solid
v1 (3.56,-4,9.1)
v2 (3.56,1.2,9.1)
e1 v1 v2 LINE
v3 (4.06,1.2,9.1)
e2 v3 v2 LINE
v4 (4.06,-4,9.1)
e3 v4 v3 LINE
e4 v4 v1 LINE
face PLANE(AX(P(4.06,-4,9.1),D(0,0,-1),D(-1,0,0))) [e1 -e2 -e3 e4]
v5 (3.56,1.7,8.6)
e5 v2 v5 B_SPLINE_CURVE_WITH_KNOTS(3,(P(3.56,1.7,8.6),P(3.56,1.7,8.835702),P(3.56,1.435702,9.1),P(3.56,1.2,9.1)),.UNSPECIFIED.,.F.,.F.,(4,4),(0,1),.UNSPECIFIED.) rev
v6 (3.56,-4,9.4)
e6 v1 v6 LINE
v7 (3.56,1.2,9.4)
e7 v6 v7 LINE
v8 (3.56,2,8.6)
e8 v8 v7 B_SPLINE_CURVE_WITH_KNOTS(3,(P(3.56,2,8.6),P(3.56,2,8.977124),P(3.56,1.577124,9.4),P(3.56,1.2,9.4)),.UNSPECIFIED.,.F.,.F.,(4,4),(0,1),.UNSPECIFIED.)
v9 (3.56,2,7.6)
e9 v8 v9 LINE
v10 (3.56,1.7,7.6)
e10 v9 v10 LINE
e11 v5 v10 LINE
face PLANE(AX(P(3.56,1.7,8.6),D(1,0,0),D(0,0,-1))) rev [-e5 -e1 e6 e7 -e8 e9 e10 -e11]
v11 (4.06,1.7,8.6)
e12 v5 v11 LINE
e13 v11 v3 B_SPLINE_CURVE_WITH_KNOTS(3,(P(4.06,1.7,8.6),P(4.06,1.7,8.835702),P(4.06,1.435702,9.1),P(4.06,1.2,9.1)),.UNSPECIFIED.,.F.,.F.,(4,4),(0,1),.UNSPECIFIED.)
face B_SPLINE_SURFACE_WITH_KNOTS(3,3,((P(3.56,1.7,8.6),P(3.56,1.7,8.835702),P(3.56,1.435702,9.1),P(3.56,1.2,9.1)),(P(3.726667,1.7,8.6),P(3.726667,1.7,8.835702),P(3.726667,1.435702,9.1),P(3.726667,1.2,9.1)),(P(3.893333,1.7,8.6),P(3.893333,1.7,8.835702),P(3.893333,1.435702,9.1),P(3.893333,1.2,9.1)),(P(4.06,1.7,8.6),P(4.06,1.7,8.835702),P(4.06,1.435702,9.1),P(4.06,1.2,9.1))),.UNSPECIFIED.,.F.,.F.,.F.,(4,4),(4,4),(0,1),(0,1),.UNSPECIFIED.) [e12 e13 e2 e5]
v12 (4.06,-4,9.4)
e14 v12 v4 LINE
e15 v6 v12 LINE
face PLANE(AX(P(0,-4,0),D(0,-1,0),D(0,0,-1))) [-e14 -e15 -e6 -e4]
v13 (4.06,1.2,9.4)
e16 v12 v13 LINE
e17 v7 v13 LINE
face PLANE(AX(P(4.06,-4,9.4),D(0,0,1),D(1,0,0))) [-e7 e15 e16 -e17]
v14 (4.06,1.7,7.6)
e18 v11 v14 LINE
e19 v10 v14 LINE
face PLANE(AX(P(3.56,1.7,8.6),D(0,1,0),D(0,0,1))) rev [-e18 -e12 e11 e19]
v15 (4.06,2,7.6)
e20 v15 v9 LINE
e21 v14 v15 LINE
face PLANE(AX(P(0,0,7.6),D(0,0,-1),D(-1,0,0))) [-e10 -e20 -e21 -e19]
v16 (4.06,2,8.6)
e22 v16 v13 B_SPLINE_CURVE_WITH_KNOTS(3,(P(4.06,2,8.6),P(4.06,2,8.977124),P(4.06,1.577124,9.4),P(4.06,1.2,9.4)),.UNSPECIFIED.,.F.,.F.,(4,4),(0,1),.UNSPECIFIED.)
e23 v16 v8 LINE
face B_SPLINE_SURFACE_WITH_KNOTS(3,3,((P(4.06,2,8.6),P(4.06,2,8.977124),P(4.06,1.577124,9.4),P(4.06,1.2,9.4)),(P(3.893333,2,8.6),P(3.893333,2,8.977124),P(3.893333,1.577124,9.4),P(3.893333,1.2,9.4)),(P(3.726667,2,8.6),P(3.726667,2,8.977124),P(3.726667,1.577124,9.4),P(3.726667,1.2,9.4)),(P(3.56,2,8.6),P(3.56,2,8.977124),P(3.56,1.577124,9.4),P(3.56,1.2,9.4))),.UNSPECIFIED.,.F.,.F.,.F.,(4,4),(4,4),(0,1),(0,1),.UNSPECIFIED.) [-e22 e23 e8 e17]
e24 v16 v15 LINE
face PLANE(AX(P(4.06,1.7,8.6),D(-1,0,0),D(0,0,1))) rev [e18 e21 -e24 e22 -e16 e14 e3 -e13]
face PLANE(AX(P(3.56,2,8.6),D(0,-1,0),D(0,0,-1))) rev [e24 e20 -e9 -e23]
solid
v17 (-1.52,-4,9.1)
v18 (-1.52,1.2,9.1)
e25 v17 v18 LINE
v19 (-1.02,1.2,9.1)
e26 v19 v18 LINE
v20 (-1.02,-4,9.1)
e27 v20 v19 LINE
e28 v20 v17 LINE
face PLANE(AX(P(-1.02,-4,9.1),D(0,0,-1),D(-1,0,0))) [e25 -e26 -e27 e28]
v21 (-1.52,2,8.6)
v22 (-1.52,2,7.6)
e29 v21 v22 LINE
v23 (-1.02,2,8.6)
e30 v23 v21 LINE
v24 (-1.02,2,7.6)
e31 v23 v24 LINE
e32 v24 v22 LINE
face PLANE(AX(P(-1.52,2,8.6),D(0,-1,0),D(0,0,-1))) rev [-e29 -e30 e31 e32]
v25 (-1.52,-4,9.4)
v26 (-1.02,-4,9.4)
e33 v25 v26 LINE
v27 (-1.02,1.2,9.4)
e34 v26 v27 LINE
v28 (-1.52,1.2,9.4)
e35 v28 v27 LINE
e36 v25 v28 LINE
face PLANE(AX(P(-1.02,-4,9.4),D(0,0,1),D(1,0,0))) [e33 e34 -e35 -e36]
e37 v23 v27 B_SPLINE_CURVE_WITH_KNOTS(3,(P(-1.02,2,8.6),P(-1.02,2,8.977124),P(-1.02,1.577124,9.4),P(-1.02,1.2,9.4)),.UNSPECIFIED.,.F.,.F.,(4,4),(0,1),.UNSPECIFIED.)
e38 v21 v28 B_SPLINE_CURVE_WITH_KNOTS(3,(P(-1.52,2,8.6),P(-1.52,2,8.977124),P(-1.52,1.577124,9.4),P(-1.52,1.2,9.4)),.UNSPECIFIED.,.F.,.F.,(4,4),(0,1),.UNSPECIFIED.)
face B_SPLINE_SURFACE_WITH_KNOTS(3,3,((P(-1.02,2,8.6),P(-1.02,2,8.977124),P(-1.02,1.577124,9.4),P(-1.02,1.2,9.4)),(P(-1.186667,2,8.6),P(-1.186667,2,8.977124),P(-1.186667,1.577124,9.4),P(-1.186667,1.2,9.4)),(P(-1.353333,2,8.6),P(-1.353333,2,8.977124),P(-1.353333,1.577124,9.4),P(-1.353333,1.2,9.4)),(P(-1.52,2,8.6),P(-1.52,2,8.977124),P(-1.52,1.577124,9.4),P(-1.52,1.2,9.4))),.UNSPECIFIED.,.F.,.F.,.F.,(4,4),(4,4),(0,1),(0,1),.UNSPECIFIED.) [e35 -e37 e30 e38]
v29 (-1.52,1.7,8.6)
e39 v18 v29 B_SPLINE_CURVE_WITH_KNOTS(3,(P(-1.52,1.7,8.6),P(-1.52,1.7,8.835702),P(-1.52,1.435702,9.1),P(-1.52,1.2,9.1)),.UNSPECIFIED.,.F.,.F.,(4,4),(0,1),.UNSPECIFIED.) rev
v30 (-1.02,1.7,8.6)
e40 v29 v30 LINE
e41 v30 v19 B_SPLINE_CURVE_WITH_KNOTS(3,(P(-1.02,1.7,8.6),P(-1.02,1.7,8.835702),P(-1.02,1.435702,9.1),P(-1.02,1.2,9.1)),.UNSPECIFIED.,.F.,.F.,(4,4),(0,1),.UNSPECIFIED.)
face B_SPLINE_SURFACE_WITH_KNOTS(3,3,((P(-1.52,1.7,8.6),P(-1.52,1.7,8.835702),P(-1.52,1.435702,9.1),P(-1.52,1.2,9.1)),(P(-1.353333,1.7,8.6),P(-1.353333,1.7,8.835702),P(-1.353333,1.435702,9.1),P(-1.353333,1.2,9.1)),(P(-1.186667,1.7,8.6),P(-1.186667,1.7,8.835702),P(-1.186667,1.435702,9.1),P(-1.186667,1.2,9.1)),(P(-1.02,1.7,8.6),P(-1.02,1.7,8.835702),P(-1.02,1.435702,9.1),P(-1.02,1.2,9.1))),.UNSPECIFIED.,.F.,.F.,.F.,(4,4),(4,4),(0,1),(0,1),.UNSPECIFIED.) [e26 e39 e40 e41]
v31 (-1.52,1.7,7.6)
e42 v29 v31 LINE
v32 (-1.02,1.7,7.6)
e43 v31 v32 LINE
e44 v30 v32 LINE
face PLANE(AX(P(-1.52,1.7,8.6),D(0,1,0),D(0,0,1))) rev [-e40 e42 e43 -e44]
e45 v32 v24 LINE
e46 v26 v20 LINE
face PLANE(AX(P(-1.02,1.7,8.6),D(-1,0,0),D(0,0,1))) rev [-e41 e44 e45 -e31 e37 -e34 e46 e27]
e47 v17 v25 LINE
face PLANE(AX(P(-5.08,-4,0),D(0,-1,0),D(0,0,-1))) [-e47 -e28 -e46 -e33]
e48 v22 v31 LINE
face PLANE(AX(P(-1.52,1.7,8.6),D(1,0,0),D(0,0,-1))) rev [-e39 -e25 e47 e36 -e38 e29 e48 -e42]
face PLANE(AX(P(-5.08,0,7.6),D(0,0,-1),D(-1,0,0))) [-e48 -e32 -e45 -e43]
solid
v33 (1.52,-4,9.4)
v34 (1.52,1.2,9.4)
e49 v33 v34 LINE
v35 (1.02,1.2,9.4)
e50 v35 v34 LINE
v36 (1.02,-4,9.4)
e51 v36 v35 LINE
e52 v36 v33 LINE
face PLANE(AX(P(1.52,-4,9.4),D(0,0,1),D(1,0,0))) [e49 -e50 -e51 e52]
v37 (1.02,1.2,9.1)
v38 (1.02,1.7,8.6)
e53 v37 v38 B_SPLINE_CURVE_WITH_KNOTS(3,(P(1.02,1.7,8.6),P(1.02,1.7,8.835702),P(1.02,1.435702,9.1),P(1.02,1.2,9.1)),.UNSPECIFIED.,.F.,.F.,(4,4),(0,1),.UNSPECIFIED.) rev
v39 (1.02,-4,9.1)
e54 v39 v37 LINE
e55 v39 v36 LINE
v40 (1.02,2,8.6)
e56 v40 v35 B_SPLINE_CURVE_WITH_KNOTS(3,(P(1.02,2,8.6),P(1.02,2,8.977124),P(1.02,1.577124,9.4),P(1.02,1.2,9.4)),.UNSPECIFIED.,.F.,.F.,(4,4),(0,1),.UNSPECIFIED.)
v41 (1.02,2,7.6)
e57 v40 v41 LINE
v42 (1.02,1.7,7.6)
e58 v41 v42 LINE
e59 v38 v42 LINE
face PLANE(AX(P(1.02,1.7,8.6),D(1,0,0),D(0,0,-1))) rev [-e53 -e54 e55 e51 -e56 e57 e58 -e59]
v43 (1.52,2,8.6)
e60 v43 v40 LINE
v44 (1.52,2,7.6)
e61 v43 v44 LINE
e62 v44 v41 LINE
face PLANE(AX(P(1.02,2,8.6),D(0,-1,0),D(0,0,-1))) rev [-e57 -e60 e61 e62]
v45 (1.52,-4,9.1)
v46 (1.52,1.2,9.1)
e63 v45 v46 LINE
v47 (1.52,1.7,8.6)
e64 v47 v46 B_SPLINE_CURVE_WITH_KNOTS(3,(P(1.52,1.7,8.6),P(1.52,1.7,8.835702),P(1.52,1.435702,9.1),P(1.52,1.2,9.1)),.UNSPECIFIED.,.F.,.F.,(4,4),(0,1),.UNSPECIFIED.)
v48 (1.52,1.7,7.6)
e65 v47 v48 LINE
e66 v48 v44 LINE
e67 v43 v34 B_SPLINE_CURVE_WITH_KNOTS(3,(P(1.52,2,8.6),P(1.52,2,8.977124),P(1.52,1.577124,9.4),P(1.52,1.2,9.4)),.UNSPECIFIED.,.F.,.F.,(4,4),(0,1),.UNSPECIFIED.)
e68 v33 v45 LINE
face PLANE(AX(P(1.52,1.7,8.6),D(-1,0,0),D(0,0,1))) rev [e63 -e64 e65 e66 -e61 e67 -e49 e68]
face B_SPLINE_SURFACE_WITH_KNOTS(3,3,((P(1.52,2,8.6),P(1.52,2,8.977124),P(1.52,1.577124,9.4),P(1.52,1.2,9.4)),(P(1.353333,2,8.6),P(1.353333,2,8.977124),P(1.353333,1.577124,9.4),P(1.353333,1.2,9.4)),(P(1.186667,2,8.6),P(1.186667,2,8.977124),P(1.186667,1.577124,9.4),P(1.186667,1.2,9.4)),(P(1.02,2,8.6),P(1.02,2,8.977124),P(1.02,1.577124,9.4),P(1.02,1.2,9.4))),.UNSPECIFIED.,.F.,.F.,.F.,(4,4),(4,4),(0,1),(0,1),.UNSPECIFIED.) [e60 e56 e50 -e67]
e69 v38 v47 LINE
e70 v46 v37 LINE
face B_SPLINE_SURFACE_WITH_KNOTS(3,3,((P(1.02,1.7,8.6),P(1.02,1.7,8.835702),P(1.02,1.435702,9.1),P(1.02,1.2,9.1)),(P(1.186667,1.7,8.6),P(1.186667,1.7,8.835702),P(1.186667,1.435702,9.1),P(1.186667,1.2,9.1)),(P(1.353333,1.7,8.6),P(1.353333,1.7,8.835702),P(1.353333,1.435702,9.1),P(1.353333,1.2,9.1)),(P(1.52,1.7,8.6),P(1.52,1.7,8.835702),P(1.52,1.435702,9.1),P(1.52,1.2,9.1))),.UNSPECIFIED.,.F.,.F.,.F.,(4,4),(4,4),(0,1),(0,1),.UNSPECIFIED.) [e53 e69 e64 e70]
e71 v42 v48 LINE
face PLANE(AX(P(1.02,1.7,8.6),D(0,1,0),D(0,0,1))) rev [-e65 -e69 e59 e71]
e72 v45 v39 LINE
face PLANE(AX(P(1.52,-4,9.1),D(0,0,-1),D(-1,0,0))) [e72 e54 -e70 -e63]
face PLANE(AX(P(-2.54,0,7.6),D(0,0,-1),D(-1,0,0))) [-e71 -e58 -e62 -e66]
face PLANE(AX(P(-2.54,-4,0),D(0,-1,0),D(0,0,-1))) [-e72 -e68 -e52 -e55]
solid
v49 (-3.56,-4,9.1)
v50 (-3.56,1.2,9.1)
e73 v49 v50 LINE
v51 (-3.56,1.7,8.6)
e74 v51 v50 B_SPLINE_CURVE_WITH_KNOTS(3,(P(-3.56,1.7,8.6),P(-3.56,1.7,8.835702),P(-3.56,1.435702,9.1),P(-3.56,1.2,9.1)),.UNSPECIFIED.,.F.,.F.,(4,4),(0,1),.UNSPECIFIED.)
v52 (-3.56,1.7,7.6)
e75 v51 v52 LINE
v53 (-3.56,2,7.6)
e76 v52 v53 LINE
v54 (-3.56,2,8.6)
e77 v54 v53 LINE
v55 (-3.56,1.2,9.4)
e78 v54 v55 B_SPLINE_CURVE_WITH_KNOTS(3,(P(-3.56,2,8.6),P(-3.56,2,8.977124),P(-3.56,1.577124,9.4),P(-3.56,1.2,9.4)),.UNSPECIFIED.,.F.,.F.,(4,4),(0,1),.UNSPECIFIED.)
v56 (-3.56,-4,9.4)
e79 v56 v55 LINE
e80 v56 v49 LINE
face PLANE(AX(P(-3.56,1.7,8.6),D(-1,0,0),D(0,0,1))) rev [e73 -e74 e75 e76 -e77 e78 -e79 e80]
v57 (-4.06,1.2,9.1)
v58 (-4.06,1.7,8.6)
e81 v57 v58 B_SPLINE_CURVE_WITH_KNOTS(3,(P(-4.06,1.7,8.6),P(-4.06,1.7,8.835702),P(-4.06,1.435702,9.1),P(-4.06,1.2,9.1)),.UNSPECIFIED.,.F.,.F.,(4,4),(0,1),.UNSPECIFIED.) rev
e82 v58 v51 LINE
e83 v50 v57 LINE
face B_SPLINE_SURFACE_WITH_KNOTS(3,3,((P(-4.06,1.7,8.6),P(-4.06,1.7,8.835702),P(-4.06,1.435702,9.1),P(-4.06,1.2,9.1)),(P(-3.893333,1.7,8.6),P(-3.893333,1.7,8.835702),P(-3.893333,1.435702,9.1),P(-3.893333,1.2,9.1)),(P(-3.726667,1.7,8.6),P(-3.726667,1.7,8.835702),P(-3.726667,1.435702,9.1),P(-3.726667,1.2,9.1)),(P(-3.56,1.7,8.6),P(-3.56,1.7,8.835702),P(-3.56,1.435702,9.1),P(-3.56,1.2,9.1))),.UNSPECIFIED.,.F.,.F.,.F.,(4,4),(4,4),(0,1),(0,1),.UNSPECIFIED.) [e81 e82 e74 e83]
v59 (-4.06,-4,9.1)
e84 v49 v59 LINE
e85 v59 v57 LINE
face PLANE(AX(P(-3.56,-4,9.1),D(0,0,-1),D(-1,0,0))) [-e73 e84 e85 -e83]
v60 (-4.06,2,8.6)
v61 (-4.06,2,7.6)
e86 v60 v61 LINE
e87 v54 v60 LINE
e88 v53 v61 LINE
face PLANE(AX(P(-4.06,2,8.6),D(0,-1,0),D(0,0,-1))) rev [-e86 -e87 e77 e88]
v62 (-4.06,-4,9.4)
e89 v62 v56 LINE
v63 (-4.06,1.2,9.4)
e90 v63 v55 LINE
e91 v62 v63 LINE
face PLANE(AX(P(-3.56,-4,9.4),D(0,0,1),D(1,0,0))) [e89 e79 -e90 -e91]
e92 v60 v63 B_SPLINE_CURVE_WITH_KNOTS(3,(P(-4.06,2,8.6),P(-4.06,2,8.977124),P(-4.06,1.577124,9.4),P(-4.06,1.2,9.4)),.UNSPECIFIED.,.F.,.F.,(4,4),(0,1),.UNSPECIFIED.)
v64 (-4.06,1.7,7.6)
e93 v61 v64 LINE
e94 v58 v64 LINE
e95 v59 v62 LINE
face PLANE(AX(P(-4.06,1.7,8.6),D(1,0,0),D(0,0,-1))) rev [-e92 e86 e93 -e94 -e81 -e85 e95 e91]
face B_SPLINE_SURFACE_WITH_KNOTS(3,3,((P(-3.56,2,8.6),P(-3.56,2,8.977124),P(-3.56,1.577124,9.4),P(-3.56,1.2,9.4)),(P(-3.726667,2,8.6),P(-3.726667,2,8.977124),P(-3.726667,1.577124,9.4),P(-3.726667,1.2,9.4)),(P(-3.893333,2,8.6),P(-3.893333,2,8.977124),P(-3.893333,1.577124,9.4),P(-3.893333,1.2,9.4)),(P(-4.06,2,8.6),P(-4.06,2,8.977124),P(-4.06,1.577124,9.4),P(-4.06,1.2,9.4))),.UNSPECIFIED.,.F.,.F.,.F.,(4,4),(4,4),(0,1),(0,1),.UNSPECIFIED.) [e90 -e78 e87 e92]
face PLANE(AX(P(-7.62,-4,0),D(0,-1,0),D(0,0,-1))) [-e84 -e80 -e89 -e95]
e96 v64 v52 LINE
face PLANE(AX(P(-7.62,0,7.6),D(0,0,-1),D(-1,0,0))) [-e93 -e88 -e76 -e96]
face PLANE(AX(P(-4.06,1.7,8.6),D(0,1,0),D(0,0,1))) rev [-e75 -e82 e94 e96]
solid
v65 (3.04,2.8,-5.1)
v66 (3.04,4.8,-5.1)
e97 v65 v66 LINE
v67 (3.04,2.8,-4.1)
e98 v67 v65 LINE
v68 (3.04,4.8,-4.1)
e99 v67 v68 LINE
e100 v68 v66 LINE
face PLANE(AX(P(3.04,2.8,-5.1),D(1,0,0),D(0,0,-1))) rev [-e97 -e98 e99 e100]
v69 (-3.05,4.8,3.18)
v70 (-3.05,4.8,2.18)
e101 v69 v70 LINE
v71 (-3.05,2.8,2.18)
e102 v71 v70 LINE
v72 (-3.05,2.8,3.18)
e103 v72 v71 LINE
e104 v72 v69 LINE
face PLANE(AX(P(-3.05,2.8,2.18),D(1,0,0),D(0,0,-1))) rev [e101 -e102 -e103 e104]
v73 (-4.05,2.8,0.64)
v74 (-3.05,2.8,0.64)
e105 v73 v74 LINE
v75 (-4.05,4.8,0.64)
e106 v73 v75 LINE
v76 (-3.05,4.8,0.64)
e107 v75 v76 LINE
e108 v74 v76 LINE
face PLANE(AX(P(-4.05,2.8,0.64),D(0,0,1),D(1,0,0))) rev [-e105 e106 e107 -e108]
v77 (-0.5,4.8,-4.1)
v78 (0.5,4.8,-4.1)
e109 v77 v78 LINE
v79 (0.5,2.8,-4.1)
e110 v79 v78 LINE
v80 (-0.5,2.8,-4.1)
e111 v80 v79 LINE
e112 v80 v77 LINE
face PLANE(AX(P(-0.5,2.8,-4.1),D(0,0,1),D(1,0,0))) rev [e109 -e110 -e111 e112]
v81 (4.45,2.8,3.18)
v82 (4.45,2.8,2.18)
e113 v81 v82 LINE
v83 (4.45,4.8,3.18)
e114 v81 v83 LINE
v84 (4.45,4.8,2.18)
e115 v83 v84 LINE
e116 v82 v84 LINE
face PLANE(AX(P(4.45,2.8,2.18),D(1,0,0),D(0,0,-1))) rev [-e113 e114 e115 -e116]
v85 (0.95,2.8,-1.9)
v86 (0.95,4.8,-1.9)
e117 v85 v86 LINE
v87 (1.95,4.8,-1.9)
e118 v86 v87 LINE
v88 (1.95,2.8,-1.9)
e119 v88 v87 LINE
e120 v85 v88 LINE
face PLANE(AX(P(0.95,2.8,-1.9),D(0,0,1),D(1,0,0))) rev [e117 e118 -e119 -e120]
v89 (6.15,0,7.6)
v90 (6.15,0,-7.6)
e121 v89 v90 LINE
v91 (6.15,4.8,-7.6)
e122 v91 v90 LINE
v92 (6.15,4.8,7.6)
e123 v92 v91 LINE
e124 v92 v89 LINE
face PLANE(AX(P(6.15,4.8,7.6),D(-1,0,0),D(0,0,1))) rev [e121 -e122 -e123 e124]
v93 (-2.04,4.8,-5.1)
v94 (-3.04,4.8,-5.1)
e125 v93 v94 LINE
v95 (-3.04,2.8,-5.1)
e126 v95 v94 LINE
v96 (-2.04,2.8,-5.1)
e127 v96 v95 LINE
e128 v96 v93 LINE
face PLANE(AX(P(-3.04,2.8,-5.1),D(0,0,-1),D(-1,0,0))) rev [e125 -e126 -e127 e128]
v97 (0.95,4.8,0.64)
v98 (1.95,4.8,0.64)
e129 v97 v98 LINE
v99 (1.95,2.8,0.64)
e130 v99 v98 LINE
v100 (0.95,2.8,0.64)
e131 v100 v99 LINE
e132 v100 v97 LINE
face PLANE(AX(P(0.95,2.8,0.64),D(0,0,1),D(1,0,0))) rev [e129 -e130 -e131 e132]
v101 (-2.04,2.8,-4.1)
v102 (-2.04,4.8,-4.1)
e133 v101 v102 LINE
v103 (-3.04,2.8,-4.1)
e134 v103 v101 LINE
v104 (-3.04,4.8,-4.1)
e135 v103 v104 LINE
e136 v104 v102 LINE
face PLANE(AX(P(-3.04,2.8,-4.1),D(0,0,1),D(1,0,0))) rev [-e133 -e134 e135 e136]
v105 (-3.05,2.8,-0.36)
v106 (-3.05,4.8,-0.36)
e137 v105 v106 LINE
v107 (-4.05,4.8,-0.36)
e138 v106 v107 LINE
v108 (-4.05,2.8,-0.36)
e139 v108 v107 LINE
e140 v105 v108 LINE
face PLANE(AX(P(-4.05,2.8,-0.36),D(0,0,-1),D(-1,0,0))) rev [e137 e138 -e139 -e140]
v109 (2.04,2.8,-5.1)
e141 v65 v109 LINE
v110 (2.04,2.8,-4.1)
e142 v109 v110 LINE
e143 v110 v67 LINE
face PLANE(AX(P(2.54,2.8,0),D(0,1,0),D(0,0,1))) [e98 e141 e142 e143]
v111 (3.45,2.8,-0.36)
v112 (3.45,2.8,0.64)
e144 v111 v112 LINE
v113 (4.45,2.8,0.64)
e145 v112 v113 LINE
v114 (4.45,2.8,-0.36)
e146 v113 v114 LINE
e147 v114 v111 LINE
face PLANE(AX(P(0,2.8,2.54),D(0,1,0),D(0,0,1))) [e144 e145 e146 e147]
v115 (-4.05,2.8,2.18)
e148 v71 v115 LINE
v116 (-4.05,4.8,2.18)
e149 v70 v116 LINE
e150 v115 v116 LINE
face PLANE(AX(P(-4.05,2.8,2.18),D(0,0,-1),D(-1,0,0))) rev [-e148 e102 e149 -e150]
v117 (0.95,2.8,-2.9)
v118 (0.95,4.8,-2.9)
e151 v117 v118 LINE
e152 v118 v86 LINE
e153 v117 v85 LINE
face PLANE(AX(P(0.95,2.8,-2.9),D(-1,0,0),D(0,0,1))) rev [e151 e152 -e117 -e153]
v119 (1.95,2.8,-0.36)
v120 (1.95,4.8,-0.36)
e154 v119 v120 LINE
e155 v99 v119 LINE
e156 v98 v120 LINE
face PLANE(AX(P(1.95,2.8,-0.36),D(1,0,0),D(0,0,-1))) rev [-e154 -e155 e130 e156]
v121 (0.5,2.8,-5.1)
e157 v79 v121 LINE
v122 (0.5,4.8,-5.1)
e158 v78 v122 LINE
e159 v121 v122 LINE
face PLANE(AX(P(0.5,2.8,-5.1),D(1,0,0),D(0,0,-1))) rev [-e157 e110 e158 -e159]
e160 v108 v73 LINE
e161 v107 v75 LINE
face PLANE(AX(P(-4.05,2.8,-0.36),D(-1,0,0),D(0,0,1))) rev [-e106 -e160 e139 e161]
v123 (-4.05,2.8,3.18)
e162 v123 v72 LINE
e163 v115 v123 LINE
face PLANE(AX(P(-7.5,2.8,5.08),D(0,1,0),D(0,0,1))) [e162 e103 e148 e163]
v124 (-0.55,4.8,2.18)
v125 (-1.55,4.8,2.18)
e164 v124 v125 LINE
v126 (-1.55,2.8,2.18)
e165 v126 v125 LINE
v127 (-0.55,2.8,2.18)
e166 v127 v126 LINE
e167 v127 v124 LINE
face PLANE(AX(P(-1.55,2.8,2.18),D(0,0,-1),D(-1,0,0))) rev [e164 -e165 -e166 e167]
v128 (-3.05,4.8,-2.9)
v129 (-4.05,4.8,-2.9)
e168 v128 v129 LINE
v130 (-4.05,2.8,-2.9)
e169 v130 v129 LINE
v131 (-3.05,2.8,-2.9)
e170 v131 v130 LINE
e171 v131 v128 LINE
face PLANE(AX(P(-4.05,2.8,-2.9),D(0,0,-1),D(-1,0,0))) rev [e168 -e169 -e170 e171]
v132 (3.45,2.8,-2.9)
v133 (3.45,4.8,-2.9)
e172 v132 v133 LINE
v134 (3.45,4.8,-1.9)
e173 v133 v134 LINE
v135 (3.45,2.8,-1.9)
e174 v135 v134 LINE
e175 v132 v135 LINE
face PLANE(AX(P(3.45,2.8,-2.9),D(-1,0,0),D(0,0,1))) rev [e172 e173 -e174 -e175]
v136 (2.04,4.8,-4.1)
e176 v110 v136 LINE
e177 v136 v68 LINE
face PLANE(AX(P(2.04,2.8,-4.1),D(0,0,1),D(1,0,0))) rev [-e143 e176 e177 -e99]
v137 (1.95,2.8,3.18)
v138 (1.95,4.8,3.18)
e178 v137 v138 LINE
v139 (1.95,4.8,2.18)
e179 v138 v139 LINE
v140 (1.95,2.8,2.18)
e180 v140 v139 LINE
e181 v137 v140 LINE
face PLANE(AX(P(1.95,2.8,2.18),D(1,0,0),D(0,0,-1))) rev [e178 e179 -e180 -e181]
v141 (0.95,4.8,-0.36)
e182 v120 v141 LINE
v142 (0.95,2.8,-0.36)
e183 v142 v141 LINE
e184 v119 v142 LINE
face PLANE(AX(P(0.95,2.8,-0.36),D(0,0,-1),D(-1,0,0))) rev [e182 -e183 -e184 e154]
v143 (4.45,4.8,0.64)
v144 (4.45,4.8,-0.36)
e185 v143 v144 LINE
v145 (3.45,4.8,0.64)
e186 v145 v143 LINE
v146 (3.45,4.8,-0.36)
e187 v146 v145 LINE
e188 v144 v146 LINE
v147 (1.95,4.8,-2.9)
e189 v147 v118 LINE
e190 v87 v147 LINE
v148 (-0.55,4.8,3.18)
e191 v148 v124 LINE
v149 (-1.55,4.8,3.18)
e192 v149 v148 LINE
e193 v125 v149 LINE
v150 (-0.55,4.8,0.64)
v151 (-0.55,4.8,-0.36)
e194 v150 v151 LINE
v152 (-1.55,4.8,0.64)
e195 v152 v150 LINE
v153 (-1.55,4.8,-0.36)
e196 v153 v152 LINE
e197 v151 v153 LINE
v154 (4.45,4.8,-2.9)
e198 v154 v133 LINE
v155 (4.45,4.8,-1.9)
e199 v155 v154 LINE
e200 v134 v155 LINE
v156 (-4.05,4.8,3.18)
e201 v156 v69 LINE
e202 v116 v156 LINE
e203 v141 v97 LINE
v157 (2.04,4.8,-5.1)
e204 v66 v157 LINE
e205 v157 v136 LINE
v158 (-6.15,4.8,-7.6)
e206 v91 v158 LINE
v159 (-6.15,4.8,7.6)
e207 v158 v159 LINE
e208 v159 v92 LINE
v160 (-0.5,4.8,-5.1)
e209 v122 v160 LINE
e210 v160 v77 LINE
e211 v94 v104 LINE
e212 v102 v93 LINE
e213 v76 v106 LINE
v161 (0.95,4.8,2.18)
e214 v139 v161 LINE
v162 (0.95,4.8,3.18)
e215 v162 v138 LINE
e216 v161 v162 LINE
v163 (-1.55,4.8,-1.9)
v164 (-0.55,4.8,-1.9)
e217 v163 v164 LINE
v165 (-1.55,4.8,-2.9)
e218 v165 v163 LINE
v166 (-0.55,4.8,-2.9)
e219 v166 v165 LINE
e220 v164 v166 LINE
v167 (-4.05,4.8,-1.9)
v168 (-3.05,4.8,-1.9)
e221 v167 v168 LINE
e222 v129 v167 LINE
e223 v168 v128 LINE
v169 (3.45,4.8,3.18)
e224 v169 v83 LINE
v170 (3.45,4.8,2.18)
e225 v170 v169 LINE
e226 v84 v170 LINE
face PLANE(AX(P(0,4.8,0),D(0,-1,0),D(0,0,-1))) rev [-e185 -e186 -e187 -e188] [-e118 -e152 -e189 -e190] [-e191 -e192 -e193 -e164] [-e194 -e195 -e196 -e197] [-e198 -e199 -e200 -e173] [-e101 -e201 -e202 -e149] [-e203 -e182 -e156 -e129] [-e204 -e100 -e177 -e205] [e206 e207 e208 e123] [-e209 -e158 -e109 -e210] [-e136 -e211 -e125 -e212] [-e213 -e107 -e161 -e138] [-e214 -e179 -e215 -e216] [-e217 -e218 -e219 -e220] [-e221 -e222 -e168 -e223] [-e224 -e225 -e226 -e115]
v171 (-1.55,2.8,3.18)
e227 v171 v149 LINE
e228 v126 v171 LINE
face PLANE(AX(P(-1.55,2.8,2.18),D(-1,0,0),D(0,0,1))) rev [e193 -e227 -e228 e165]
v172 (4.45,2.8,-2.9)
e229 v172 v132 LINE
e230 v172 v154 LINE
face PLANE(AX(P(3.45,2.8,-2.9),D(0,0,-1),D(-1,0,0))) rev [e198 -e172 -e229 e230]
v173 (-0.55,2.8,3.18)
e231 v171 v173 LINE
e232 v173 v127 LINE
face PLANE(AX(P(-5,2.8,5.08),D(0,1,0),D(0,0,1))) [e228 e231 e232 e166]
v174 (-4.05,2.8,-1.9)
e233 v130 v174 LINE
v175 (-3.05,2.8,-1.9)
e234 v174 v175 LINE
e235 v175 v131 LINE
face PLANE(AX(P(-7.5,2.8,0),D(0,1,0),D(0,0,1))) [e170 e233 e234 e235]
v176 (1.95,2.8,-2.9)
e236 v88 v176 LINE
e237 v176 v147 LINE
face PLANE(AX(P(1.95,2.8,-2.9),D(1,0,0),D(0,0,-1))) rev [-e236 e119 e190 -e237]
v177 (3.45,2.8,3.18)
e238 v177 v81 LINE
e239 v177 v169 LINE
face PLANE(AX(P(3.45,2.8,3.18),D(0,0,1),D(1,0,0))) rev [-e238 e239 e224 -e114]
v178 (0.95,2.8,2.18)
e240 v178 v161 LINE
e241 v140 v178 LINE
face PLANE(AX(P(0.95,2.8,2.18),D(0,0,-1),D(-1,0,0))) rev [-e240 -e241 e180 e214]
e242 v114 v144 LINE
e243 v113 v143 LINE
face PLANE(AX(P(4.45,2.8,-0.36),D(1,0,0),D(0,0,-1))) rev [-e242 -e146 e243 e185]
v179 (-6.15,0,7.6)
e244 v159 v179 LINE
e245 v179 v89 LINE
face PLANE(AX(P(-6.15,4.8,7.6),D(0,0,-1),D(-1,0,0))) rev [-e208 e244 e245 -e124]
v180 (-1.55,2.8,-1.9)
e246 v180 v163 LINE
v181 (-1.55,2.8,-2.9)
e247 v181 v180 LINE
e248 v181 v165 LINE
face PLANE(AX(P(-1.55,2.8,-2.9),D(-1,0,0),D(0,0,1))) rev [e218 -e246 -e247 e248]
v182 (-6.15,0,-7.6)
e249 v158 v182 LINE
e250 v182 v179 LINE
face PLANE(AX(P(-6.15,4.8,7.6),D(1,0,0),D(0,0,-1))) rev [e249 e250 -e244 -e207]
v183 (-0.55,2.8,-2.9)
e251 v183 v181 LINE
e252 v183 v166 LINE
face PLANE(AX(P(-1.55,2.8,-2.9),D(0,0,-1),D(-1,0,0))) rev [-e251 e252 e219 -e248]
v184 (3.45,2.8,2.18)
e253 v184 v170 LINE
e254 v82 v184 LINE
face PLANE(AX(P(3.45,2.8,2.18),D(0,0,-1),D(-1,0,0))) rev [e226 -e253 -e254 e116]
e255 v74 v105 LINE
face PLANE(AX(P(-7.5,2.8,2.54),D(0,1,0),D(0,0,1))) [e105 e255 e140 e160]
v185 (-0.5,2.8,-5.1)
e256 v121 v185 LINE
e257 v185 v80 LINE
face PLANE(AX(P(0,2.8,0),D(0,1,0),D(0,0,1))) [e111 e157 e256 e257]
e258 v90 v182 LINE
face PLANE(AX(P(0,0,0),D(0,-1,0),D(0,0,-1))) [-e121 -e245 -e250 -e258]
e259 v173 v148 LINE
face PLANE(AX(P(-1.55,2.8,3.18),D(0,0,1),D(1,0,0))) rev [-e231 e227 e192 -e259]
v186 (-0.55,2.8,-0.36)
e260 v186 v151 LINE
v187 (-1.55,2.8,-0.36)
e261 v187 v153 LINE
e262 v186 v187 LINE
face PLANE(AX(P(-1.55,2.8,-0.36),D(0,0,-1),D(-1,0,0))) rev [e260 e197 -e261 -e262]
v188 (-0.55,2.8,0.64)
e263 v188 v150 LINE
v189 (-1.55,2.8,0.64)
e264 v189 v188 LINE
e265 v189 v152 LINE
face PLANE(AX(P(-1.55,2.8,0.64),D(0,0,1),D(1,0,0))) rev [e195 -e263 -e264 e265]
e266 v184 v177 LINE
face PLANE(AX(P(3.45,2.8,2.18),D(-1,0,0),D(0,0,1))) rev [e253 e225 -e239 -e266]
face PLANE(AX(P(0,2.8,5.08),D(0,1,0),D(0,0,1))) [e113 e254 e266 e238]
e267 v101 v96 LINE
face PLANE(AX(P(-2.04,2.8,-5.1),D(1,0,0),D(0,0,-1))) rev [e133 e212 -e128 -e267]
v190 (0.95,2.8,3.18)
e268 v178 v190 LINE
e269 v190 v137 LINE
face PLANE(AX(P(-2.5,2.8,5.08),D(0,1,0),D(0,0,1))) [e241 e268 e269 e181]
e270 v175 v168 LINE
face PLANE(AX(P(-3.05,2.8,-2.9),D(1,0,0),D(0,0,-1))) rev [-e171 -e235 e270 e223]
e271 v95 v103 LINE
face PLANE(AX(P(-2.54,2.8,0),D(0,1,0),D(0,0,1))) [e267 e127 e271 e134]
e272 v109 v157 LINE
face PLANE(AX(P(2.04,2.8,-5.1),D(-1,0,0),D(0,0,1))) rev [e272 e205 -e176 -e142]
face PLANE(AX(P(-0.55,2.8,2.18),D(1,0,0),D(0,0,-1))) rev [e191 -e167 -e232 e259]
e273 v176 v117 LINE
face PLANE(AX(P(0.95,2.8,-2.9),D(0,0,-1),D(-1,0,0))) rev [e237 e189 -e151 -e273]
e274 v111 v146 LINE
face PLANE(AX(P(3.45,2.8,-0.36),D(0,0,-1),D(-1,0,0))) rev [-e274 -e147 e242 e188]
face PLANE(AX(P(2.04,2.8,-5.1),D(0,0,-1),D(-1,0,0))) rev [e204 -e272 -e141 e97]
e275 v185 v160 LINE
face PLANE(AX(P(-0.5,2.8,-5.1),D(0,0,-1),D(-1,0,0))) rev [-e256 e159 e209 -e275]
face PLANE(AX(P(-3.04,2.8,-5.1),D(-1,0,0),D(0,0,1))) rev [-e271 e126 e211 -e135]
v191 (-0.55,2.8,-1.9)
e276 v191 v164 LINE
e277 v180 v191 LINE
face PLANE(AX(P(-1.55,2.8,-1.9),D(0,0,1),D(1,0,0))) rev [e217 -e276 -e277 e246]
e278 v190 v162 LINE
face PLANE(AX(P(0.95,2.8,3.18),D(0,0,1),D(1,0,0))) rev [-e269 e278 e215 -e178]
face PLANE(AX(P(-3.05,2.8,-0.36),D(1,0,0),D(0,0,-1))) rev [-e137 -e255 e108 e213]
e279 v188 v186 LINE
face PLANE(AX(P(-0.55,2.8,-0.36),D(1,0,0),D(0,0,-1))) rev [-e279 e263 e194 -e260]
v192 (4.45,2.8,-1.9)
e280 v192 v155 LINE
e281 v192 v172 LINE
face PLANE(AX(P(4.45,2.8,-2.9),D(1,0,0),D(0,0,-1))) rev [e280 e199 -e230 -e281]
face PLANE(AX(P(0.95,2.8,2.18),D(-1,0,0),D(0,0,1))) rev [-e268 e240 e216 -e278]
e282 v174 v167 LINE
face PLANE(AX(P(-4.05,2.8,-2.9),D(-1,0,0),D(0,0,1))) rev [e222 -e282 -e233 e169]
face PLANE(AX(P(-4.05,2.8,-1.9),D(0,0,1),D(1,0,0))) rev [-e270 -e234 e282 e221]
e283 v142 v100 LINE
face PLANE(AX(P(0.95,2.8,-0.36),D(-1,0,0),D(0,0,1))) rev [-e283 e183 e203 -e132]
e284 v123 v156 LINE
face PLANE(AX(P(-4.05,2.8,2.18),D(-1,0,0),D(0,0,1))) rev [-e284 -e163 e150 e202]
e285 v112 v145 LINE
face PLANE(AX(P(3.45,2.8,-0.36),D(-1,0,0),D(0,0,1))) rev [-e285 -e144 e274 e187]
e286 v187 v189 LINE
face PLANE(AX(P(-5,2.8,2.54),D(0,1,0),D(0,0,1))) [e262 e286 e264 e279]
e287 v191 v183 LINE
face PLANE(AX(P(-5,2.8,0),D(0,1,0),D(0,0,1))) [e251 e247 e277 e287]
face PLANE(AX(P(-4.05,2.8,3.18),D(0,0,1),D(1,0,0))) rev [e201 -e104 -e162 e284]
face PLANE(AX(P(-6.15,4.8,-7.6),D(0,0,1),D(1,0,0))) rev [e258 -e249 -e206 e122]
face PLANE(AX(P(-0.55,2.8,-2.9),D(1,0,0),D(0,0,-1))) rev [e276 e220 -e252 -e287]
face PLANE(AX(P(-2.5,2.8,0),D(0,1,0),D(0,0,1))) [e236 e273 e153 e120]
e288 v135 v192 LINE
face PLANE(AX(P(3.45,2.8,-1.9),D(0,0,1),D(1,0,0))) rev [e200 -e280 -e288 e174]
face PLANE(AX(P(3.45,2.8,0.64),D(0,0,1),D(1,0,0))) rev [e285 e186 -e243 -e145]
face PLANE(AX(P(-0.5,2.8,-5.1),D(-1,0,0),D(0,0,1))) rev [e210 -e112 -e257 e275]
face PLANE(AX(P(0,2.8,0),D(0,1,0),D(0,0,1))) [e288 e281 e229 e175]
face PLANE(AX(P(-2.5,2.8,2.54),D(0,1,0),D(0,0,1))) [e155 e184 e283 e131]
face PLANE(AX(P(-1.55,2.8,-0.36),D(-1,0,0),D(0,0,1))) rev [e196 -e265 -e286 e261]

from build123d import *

# Parameters (mm, degrees)
SKETCH_1_W                  = 12.3
SKETCH_1_H                  = 15.2
EXTRUDE_1_DEPTH             = 4.8
SKETCH_2_W                  = 0.5
SKETCH_2_H                  = 0.3
EXTRUDE_2_DEPTH             = 1
EXTRUDE_3_DEPTH             = 1.2
EXTRUDE_3_DEPTH_BACK        = 4
SKETCH_5_W                  = 0.5
SKETCH_5_H                  = 0.3
LOFT_START                  = 3.56
LOFT_1_DEPTH                = 0.5
PATTERN_LINEAR_1_COUNT      = 4
PATTERN_LINEAR_1_PITCH      = 2.54
SKETCH_3_W                  = 1
SKETCH_3_H                  = 1
CUT_EXTRUDE_1_DEPTH         = 2
PATTERN_LINEAR_2_COUNT      = 2
PATTERN_LINEAR_2_PITCH      = 2.54
PATTERN_LINEAR_2_COL_COUNT  = 2
PATTERN_LINEAR_2_COL_PITCH  = 2.54
SKETCH_4_W                  = 1
SKETCH_4_H                  = 1
CUT_EXTRUDE_2_DEPTH         = 2
PATTERN_LINEAR_3_COUNT      = 4
PATTERN_LINEAR_3_PITCH      = 2.5
PATTERN_LINEAR_3_COUNT_DIR2 = 3
PATTERN_LINEAR_3_PITCH_DIR2 = 2.54


# Read off the part's stored shape, not the designer's step: По сечениям1
with BuildPart() as part:
    # Эскиз1 → Бобышка-Вытянуть1 (new body)
    with BuildSketch(Plane(origin=(0, 0, 0), x_dir=(1, 0, 0), z_dir=(0, 1, 0))):
        Rectangle(SKETCH_1_W, SKETCH_1_H)
    extrude(amount=EXTRUDE_1_DEPTH)

    # Эскиз3 → Вырез-Вытянуть1 (cut)
    with BuildSketch(Plane(origin=(0, 4.8, 0), x_dir=(1, 0, 0), z_dir=(0, 1, 0))):
        with Locations((0, 4.6)):
            Rectangle(SKETCH_3_W, SKETCH_3_H)
    cut_extrude_1 = extrude(amount=-CUT_EXTRUDE_1_DEPTH, mode=Mode.SUBTRACT)

    # Линейный массив2: Вырез-Вытянуть1 ×2
    with Locations(*[(i * PATTERN_LINEAR_2_PITCH, 0, 0) for i in range(1, PATTERN_LINEAR_2_COUNT)]):
        add(cut_extrude_1, mode=Mode.SUBTRACT)

    # Линейный массив2 col: Вырез-Вытянуть1 ×2
    with Locations(*[(-i * PATTERN_LINEAR_2_COL_PITCH, 0, 0) for i in range(1, PATTERN_LINEAR_2_COL_COUNT)]):
        add(cut_extrude_1, mode=Mode.SUBTRACT)

    # Эскиз4 → Вырез-Вытянуть2 (cut)
    with BuildSketch(Plane(origin=(0, 4.8, 0), x_dir=(1, 0, 0), z_dir=(0, 1, 0))):
        with Locations((3.95, 2.4)):
            Rectangle(SKETCH_4_W, SKETCH_4_H)
    cut_extrude_2 = extrude(amount=-CUT_EXTRUDE_2_DEPTH, mode=Mode.SUBTRACT)

    # Линейный массив3: Cut-Extrude 2 4 × 3
    with Locations(*[(-i * PATTERN_LINEAR_3_PITCH, 0, j * PATTERN_LINEAR_3_PITCH_DIR2) for i in range(PATTERN_LINEAR_3_COUNT) for j in range(PATTERN_LINEAR_3_COUNT_DIR2) if (i, j) != (0, 0)]):
        add(cut_extrude_2, mode=Mode.SUBTRACT)


with BuildPart() as body_2:
    # Эскиз2 → Бобышка-Вытянуть2 (new body)
    with BuildSketch(Plane.XY.offset(7.6)):
        with Locations((3.81, 1.85)):
            Rectangle(SKETCH_2_W, SKETCH_2_H)
    extrude(amount=EXTRUDE_2_DEPTH)



with BuildPart() as body_3:
    # Эскиз5 → Бобышка-Вытянуть3 (new, two sides: drawn at the far end of the back side and taken through both)
    with BuildSketch(Plane(origin=(0, 0, 0), x_dir=(1, 0, 0), z_dir=(0, 1, 0)).offset(-EXTRUDE_3_DEPTH_BACK)):
        with Locations((3.81, -9.25)):
            Rectangle(SKETCH_5_W, SKETCH_5_H)
    extrude(amount=EXTRUDE_3_DEPTH + EXTRUDE_3_DEPTH_BACK)


with BuildPart() as body_2_1:
    add(body_2.part)

    add(body_3.part)  # По сечениям1 merges body 3
    # По сечениям1 outline → По сечениям1 (add)
    with BuildSketch(Plane.YZ.offset(LOFT_START)):
        with BuildLine():
            add(Edge.make_bspline(
                [(1.7, 8.6), (1.7, 8.83570226), (1.43570226, 9.1), (1.2, 9.1)],
                knots=[0, 0, 0, 0, 1, 1, 1, 1], degree=3))
            Line((1.7, 8.6), (2, 8.6))
            add(Edge.make_bspline(
                [(2, 8.6), (2, 8.977123617), (1.577123617, 9.4), (1.2, 9.4)],
                knots=[0, 0, 0, 0, 1, 1, 1, 1], degree=3))
            Line((1.2, 9.4), (1.2, 9.1))
        make_face()
    extrude(amount=LOFT_1_DEPTH)


with BuildPart() as pattern_linear_1_1:
    # Линейный массив1: pattern copy
    add(body_2_1.part.moved(Location(Vector(-1, 0, 0) * (1 * PATTERN_LINEAR_1_PITCH))))


with BuildPart() as pattern_linear_1_2:
    # Линейный массив1: pattern copy
    add(body_2_1.part.moved(Location(Vector(-1, 0, 0) * (2 * PATTERN_LINEAR_1_PITCH))))


with BuildPart() as pattern_linear_1_3:
    # Линейный массив1: pattern copy
    add(body_2_1.part.moved(Location(Vector(-1, 0, 0) * (3 * PATTERN_LINEAR_1_PITCH))))


solid = Compound([part.part, body_2_1.part, pattern_linear_1_1.part, pattern_linear_1_2.part, pattern_linear_1_3.part])
